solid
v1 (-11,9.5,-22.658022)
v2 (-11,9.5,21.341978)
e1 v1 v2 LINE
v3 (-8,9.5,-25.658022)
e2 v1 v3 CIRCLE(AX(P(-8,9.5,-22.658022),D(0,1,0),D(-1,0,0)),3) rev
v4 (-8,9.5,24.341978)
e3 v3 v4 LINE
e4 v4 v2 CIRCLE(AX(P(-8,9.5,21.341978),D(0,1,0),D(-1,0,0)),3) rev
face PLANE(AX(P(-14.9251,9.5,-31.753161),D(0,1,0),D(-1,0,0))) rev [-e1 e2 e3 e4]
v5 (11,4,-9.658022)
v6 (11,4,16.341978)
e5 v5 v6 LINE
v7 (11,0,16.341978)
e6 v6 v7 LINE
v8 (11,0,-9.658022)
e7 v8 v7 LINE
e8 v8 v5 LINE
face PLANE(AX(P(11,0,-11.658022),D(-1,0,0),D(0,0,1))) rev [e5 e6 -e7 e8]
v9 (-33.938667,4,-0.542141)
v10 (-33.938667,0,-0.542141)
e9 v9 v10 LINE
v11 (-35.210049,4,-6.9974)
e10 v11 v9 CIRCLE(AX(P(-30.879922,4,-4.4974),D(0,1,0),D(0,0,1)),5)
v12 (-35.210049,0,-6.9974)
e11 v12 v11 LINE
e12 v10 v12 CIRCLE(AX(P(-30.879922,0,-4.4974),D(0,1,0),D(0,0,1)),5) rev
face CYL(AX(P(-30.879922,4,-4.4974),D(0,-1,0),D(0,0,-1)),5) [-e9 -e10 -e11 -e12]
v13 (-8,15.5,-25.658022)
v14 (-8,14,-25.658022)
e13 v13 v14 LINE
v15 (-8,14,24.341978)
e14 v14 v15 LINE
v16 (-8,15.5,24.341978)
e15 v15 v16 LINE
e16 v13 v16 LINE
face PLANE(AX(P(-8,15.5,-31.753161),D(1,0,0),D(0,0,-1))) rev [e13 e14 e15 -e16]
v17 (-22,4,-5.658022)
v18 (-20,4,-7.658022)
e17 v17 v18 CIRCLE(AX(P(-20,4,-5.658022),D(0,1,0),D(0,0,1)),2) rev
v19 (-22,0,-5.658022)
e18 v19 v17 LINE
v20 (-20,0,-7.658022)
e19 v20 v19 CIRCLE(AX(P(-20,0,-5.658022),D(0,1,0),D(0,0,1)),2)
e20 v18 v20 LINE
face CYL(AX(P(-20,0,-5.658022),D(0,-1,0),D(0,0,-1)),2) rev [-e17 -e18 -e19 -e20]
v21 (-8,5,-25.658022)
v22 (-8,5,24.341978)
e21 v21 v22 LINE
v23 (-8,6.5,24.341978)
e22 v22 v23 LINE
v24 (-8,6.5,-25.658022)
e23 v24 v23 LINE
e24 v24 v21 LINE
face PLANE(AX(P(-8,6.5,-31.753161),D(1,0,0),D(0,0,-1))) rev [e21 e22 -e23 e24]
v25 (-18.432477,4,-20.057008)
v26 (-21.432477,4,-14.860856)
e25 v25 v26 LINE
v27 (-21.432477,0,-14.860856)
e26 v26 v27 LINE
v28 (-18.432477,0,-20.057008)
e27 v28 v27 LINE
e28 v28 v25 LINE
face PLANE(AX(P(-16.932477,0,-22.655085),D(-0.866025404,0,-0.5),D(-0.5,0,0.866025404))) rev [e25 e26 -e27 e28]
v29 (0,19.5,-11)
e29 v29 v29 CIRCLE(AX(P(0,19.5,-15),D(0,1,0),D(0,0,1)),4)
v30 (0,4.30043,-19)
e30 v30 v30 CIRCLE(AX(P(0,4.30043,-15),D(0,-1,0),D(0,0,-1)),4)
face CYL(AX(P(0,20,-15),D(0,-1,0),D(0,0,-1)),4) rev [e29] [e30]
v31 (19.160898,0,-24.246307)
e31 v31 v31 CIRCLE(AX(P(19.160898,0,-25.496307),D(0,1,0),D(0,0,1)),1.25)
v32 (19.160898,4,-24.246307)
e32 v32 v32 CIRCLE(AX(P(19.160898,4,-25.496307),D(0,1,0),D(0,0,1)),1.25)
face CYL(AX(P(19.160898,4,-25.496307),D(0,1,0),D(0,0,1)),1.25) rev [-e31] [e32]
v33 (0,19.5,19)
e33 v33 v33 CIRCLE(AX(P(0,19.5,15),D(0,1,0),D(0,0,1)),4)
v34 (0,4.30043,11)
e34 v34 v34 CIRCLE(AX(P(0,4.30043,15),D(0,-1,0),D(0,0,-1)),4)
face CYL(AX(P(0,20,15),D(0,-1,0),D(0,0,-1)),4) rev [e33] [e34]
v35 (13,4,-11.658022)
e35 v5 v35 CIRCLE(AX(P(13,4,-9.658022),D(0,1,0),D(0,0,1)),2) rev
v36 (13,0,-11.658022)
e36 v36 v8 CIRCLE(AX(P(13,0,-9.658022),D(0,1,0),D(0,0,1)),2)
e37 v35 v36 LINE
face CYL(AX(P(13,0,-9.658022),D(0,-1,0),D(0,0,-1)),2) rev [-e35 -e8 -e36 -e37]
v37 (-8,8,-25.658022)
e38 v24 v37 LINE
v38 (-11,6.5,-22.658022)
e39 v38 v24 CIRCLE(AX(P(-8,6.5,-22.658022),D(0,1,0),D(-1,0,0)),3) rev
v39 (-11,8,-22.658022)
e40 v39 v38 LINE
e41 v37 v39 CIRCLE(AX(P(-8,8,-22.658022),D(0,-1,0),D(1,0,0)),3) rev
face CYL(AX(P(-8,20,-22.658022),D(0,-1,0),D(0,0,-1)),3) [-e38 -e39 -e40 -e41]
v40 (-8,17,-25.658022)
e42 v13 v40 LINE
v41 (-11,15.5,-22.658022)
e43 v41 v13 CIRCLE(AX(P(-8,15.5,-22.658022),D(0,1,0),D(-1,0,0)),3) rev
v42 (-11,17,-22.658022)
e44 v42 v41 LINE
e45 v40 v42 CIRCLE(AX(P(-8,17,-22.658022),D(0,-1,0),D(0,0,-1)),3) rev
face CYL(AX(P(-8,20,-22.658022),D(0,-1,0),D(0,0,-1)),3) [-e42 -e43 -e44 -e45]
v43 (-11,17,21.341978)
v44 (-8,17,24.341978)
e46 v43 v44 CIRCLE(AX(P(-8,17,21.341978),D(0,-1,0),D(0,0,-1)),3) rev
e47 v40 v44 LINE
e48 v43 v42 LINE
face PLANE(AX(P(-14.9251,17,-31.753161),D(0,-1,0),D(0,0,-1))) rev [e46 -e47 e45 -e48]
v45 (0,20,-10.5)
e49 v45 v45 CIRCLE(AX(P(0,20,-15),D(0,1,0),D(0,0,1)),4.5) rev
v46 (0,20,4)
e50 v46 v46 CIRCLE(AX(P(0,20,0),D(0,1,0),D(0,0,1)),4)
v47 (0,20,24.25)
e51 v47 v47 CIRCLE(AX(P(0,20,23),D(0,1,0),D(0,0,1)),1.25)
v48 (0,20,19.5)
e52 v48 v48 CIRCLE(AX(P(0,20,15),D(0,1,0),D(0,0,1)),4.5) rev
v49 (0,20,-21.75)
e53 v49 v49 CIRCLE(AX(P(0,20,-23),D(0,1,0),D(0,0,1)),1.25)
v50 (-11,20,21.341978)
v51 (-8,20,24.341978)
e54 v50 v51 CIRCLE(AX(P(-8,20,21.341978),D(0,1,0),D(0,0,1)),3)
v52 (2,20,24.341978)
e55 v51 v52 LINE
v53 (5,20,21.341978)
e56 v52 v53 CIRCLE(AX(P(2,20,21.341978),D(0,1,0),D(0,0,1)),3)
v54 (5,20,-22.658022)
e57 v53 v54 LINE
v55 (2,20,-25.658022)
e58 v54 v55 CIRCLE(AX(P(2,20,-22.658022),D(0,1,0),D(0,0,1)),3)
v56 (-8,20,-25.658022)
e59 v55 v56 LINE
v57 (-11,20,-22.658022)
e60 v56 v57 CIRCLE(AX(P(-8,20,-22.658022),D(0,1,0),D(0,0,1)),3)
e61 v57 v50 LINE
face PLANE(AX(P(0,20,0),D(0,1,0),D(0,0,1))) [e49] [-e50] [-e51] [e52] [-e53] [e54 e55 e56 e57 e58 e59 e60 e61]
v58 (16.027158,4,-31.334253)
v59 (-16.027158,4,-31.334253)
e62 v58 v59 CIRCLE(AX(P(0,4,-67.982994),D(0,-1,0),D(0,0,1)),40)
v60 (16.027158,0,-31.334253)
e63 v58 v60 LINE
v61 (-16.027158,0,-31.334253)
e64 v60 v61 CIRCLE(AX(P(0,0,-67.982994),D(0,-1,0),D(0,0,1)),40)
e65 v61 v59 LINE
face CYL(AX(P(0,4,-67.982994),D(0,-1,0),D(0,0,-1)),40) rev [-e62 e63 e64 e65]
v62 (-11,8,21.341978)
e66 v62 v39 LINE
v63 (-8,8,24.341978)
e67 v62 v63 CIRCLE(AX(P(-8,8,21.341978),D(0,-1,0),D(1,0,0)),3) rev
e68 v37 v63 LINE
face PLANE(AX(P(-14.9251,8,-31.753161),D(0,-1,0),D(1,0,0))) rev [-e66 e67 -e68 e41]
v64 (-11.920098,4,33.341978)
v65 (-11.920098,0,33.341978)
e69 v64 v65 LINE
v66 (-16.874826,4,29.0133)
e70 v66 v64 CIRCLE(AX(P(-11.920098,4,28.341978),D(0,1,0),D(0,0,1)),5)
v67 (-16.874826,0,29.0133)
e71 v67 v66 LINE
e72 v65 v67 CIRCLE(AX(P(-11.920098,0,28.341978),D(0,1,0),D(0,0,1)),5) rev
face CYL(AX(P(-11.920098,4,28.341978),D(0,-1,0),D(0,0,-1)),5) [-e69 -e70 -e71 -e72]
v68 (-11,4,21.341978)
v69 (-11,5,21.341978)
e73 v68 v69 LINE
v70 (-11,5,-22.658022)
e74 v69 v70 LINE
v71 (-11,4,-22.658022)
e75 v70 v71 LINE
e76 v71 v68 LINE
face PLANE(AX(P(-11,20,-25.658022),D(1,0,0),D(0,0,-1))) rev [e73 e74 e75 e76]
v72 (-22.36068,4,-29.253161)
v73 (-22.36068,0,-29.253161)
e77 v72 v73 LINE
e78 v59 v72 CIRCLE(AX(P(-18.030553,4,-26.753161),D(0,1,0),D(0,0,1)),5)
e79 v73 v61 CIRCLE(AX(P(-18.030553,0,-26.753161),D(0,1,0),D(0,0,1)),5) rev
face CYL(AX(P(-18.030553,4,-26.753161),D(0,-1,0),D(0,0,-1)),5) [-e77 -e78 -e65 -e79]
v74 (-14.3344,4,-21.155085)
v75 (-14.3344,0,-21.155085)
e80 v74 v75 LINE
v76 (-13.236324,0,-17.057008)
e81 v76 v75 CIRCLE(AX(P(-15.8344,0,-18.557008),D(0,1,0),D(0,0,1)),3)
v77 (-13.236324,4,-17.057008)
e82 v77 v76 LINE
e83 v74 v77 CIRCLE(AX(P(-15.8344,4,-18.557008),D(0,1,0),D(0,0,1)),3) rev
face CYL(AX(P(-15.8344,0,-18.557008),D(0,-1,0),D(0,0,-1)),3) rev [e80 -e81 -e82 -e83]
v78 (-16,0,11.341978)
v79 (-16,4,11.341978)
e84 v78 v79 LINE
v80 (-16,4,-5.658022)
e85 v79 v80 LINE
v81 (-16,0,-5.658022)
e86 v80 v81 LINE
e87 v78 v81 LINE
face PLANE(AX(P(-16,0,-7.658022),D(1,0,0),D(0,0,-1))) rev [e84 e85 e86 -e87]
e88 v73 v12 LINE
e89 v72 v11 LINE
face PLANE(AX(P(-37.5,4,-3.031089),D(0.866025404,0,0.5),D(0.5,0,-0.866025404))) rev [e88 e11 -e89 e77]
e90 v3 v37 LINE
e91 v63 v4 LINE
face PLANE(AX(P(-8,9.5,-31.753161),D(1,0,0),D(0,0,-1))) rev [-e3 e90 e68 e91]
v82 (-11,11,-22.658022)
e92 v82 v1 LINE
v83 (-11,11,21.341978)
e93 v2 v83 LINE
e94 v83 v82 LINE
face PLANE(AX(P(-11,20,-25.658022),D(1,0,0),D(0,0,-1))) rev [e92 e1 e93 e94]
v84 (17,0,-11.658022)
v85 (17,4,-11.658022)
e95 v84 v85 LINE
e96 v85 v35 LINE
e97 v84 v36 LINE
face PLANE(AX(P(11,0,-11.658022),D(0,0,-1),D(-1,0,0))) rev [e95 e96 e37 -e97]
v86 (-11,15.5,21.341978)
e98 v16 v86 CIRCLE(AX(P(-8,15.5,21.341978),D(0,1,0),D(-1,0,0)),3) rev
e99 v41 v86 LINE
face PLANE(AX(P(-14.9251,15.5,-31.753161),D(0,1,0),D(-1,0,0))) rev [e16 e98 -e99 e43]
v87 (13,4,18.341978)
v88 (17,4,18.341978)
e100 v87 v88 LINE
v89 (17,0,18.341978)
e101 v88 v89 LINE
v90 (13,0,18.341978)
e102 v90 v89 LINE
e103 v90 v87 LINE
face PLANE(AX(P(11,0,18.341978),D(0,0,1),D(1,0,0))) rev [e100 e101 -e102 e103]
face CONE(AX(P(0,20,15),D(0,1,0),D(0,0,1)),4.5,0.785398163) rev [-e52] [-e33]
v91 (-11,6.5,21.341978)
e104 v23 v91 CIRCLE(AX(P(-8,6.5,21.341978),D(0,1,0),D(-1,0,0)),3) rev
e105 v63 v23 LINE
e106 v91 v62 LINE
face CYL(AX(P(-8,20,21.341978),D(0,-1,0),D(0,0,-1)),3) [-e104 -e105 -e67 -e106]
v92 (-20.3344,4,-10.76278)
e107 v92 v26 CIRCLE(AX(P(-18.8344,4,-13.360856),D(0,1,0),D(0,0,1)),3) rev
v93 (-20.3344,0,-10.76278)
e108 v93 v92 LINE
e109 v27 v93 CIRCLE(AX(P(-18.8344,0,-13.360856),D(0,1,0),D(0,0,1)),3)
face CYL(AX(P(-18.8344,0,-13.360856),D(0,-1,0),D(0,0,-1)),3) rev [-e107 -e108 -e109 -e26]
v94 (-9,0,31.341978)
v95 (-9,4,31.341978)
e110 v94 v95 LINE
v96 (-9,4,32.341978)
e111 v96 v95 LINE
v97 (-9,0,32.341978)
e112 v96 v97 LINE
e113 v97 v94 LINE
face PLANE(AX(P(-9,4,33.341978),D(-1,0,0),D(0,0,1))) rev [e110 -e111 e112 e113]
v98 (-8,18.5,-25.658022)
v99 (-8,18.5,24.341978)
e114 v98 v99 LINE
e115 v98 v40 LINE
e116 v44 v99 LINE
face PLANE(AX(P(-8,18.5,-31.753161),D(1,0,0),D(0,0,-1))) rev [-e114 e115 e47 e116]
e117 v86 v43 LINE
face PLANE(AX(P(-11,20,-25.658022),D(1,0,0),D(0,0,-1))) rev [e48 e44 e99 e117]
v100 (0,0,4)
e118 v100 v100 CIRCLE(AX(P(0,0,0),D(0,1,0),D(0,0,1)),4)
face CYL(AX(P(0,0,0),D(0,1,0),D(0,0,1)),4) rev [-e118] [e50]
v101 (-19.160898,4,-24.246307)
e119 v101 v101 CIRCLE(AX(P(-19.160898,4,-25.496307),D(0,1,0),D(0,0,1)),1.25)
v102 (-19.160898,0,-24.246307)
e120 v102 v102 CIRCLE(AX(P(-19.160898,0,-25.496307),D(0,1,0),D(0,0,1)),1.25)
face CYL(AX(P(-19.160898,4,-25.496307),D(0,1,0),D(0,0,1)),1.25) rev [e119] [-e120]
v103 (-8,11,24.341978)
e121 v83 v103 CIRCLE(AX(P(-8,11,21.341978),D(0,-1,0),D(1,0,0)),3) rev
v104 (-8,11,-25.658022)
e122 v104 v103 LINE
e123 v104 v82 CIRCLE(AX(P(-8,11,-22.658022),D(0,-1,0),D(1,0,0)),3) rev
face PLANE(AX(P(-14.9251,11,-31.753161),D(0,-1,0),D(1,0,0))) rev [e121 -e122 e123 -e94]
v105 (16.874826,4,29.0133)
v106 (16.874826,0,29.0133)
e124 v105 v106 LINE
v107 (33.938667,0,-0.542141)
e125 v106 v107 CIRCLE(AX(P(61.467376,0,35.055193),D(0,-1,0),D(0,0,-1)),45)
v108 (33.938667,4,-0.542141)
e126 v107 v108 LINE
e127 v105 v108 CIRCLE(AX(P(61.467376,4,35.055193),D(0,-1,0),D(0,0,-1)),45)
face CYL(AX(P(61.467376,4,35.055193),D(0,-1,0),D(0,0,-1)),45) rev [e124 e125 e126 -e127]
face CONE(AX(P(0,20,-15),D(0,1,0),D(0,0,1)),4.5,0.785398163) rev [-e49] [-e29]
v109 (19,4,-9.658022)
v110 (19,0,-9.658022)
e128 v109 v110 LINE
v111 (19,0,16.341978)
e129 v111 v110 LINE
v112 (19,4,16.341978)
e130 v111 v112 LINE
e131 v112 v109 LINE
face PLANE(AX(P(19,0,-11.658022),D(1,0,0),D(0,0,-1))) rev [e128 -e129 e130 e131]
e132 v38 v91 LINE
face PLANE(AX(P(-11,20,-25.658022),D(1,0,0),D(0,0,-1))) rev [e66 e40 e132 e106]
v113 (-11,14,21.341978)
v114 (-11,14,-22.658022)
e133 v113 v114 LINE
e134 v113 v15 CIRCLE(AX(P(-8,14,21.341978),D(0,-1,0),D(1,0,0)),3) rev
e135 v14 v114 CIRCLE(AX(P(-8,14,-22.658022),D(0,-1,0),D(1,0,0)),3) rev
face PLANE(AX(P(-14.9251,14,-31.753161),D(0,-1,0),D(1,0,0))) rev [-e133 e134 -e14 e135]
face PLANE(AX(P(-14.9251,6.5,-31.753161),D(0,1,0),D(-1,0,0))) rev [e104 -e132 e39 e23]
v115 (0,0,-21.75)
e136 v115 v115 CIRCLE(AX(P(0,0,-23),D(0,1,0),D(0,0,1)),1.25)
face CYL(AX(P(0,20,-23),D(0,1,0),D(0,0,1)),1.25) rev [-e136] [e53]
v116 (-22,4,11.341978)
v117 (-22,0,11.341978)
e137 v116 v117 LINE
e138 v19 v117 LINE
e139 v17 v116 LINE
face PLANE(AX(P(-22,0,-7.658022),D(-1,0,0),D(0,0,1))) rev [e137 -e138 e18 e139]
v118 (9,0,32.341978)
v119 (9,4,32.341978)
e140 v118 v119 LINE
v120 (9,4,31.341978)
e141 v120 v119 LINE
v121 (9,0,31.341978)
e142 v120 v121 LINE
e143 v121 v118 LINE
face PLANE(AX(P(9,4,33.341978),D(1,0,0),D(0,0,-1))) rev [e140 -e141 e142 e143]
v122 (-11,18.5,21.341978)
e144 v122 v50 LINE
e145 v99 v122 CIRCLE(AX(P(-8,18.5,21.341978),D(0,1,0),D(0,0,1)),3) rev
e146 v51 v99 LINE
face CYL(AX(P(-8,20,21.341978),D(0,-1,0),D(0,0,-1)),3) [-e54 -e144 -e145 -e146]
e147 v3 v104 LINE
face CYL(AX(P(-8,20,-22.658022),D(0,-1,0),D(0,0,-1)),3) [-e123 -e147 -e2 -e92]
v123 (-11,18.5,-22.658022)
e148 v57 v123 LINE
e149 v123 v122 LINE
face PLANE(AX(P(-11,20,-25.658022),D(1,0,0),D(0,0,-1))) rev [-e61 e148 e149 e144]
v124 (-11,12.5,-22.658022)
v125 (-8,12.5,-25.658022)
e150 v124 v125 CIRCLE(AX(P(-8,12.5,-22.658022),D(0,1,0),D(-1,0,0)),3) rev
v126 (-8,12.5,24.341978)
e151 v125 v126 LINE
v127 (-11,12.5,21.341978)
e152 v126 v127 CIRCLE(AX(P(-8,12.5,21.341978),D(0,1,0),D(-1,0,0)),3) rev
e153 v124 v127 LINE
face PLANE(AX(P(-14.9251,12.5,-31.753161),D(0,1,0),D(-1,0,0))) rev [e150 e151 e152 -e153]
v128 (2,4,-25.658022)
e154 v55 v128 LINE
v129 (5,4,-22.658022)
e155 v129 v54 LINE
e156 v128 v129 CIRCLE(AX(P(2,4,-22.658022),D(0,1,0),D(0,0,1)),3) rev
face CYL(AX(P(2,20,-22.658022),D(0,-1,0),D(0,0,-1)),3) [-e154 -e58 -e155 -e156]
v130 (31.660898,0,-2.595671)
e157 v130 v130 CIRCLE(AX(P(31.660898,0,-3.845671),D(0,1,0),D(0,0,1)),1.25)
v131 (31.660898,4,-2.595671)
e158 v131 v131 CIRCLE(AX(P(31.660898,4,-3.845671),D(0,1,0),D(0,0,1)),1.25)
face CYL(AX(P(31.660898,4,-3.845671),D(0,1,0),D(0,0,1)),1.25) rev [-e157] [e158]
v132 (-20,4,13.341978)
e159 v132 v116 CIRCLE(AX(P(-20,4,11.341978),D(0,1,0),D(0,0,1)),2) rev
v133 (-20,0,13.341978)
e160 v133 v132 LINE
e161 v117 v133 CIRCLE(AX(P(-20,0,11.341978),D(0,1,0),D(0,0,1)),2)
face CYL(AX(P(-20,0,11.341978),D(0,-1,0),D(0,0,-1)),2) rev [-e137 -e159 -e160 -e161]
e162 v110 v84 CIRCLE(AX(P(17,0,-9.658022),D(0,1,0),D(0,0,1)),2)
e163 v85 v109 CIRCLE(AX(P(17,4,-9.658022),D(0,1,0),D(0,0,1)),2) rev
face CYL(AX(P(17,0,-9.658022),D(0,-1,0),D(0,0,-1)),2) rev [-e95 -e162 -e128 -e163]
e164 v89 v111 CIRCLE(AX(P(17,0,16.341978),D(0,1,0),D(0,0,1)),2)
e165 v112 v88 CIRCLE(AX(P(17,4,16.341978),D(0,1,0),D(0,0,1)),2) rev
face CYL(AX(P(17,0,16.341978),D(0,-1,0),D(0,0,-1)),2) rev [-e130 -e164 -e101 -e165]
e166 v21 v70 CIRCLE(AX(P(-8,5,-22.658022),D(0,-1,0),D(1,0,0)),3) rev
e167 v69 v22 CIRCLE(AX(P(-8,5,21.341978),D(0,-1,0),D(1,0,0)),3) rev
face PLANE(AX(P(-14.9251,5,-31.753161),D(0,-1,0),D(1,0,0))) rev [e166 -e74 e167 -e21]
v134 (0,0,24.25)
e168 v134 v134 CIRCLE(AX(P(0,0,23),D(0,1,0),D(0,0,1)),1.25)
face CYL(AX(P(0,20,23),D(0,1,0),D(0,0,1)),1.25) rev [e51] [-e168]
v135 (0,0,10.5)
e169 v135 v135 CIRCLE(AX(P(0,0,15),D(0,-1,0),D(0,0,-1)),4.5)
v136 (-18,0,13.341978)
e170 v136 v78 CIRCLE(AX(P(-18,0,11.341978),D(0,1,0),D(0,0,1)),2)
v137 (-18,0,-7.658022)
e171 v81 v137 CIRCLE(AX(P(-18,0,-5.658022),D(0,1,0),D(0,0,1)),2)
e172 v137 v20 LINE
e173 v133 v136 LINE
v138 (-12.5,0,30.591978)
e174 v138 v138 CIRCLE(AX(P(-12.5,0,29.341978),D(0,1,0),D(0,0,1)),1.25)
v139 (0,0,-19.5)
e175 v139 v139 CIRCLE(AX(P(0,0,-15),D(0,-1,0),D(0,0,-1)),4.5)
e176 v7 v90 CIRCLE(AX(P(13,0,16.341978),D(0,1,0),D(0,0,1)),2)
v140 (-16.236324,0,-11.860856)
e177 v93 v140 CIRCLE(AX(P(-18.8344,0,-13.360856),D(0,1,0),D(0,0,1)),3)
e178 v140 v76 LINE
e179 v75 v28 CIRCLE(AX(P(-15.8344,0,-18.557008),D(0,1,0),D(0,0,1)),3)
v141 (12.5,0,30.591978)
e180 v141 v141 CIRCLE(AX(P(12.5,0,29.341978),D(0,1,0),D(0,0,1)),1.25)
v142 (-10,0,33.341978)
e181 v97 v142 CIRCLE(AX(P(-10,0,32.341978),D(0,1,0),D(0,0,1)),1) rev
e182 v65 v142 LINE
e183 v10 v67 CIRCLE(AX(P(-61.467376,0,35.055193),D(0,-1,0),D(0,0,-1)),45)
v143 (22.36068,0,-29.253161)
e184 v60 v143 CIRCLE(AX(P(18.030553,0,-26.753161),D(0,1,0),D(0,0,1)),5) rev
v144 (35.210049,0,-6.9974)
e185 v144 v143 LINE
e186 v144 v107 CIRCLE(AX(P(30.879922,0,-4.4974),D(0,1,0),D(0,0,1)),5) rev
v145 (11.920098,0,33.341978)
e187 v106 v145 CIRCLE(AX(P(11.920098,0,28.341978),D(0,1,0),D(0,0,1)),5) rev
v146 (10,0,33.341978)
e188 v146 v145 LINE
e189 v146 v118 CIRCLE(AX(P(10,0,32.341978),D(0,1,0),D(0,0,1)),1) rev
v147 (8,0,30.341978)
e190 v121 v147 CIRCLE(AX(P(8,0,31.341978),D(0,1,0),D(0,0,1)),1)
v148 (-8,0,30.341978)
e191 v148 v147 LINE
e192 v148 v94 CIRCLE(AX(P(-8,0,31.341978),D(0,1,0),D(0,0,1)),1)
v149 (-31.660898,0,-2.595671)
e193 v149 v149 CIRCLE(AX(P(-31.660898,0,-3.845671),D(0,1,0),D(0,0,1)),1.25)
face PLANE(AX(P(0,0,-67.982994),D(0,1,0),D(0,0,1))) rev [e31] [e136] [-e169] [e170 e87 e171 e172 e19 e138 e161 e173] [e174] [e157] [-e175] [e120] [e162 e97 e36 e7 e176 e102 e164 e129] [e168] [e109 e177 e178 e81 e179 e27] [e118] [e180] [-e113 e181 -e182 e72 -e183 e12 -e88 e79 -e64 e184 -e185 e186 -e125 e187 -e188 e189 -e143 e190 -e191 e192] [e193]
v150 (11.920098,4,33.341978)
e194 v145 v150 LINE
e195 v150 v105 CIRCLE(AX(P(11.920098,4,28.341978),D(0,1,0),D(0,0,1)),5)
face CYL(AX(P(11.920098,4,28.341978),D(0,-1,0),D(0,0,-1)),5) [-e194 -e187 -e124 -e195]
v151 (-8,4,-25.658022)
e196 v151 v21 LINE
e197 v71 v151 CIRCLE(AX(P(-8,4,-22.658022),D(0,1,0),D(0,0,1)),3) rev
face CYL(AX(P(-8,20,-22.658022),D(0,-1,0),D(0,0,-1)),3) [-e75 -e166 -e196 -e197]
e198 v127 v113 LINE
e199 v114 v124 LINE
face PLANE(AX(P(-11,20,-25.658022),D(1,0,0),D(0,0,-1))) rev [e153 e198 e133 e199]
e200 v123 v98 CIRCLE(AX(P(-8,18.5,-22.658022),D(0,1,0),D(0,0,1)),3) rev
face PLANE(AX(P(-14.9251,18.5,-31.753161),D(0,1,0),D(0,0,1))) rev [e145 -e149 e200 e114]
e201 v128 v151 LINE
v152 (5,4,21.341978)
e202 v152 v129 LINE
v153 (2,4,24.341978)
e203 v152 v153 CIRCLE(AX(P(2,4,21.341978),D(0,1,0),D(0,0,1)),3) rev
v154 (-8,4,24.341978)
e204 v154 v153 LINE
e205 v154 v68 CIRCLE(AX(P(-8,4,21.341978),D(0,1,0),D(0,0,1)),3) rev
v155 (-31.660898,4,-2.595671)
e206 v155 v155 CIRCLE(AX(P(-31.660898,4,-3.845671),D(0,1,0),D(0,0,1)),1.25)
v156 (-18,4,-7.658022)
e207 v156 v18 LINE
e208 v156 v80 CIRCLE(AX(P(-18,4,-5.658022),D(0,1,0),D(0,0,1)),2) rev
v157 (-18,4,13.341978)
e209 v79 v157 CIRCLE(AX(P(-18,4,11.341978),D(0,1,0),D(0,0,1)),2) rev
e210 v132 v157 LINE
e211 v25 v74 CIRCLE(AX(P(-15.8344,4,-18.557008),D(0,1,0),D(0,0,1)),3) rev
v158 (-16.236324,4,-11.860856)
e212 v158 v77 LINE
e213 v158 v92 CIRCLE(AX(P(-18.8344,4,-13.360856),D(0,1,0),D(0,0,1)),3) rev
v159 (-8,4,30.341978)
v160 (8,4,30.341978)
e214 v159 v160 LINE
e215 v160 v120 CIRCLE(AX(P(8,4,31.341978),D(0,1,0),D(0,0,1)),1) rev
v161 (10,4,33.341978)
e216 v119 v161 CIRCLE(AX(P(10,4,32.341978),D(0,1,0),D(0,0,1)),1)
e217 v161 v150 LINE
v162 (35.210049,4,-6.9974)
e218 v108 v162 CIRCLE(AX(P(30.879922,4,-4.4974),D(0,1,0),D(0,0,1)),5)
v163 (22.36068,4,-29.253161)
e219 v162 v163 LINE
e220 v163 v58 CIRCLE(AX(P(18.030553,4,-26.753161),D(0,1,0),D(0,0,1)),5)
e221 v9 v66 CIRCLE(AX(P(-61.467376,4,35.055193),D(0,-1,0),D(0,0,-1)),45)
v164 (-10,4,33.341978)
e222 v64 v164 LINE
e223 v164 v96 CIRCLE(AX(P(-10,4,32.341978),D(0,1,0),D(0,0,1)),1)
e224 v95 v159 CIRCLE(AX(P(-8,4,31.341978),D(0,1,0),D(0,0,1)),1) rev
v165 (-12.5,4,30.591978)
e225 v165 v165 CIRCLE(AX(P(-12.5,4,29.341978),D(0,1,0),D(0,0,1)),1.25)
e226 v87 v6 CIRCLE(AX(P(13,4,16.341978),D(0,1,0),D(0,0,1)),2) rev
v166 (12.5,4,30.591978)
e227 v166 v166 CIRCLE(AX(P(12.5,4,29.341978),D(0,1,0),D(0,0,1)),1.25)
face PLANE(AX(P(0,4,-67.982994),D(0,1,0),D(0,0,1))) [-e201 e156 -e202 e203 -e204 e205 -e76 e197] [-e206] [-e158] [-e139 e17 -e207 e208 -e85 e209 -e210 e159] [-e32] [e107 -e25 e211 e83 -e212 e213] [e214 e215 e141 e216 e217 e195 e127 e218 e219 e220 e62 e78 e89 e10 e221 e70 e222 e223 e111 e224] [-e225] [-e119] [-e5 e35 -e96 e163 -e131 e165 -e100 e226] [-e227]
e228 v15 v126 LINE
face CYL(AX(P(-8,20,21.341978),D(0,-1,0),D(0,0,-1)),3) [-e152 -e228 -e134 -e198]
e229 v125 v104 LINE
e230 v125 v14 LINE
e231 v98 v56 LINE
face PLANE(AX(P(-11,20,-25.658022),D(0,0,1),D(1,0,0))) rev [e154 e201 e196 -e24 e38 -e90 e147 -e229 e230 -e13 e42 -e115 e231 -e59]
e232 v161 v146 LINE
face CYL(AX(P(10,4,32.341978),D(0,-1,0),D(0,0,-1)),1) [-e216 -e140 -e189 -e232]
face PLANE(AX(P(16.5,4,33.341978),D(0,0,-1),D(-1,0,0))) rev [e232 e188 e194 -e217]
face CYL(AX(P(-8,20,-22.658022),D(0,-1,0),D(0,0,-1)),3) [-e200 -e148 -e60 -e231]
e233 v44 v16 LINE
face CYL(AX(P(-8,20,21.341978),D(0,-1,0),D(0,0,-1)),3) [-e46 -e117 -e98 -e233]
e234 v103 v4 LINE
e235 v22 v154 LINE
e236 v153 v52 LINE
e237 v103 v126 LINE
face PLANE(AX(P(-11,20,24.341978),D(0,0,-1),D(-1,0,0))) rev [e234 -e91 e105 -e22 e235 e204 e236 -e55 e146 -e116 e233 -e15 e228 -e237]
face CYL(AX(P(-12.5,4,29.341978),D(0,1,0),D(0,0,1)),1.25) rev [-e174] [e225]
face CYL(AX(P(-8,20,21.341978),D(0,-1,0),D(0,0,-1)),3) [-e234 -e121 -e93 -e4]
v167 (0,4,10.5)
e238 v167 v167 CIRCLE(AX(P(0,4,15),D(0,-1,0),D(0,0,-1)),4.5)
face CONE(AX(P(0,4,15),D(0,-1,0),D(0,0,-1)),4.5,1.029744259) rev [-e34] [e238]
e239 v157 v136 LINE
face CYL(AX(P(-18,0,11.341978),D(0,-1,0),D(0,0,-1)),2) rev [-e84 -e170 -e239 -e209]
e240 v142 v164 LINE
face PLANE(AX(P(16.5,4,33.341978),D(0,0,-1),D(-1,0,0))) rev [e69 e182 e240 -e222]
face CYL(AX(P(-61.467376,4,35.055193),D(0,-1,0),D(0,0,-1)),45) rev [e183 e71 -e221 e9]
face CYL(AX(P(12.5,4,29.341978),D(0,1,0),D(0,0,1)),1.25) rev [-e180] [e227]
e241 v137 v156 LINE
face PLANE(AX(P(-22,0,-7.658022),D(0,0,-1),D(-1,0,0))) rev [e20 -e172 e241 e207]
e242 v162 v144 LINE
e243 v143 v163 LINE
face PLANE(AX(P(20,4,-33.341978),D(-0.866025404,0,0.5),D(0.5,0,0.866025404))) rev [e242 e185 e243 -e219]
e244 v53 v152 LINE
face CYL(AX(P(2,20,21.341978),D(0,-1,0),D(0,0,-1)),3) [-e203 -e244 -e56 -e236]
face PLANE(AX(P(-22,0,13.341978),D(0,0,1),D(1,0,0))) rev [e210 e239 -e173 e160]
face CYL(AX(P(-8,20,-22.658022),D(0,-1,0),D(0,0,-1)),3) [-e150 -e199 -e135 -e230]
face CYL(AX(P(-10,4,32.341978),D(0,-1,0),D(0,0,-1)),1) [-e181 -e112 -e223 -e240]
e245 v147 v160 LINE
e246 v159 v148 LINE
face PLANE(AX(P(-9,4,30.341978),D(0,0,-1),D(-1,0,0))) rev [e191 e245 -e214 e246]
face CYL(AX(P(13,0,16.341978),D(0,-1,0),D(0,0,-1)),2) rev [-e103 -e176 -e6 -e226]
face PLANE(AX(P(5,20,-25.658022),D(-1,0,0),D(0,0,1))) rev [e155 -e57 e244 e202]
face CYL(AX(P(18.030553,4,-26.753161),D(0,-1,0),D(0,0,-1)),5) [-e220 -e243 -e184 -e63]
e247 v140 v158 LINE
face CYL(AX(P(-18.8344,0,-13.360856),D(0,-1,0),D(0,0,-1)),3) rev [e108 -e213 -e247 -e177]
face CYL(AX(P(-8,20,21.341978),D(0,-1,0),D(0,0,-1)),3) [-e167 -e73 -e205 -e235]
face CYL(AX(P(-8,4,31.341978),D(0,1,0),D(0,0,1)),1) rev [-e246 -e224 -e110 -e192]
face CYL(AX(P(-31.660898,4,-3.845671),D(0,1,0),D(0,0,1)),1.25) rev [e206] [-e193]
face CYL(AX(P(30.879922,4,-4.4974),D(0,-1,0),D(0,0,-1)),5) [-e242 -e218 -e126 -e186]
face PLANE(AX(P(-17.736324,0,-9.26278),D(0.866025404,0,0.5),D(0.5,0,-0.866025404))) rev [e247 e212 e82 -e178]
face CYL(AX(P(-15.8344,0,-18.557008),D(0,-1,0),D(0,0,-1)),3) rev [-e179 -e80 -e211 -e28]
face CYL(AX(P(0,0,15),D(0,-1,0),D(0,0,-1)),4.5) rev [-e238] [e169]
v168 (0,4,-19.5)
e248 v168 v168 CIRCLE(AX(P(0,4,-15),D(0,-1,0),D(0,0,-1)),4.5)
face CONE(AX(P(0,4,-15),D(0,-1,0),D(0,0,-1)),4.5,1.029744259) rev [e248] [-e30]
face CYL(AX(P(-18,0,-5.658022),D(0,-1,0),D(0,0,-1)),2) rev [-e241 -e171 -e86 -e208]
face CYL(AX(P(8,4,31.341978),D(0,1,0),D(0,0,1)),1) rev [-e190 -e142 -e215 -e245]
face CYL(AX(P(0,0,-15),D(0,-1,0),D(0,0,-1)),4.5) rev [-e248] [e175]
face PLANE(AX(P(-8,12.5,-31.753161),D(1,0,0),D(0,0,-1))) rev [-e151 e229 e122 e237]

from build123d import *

# Parameters (mm, degrees)
EXTRUDE_1_DEPTH           = 4
FILLET_1_R                = 5
SKETCH_2_W                = 16
SKETCH_2_H                = 50
EXTRUDE_2_DEPTH           = 16
FILLET_2_R                = 3
SKETCH_3_W                = 6.925100322
SKETCH_3_H                = 1.5
CUT_EXTRUDE_1_DEPTH       = 70.527213361
SKETCH_4_W                = 8
SKETCH_4_H                = 30
CUT_EXTRUDE_2_DEPTH       = 52.527238457
FILLET_3_R                = 2
SKETCH_5_R                = 4
CUT_EXTRUDE_3_DEPTH       = 53.906108371
SKETCH_6_W                = 6
SKETCH_6_H                = 21
CUT_EXTRUDE_4_DEPTH       = 52.527238457
FILLET_4_R                = 2
SKETCH_7_R                = 4
CUT_EXTRUDE_5_DEPTH       = 53.906108371
CHAMFER_1_SIZE            = 0.5
M10X1_0_1_D               = 9
M10X1_0_1_DEPTH           = 4
M10X1_0_1_TIP             = 2.703872786
SKETCH_10_R               = 1
CUT_EXTRUDE_6_DEPTH       = 53.906108371
HOLE_WIZARD_M3_1_D        = 2.5
CUT_EXTRUDE_7_DEPTH       = 52.527238457
FILLET_5_R                = 3
SKETCH_17_W               = 18
SKETCH_17_H               = 3
CUT_EXTRUDE_10_DEPTH      = 4
SKETCH_18_R               = 1
CUT_EXTRUDE_11_DEPTH      = 52.527238457
HOLE_WIZARD_M3_3_D        = 2.5
PATTERN_CIRCULAR_14_COUNT = 3
FILLET_8_R                = 1


with BuildPart() as part:
    # 草圖1 → 填料-伸長1 (new body)
    with BuildSketch(Plane(origin=(0, 0, 0), x_dir=(1, 0, 0), z_dir=(0, 1, 0))):
        with BuildLine():
            Line((20, 33.341978046), (37.5, 3.031088913))
            ThreePointArc((37.5, 3.031088913), (22.496232709, -12.555193308), (16.5, -33.341978046))
            Line((16.5, -33.341978046), (-16.5, -33.341978046))
            ThreePointArc((-16.5, -33.341978046), (-22.496232709, -12.555193308), (-37.5, 3.031088913))
            Line((-37.5, 3.031088913), (-20, 33.341978046))
            ThreePointArc((-20, 33.341978046), (0, 27.982994197), (20, 33.341978046))
        make_face()
    extrude(amount=EXTRUDE_1_DEPTH)

    # 圓角1
    fillet_1_edges = [part.edges().sort_by_distance(p)[0] for p in [
        (20, 2, -33.341978046),
        (37.5, 2, -3.031088913),
        (16.5, 2, 33.341978046),
        (-16.5, 2, 33.341978046),
        (-37.5, 2, -3.031088913),
        (-20, 2, -33.341978046),
    ]]
    fillet(fillet_1_edges, radius=FILLET_1_R)

    # 草圖2 → 填料-伸長2 (add)
    with BuildSketch(Plane(origin=(0, 4, 0), x_dir=(1, 0, 0), z_dir=(0, 1, 0))):
        with Locations((-3, 0.658021954)):
            Rectangle(SKETCH_2_W, SKETCH_2_H)
    extrude(amount=EXTRUDE_2_DEPTH)

    # 圓角2
    fillet_2_edges = [part.edges().sort_by_distance(p)[0] for p in [
        (-11, 12, -25.658021954),
        (-11, 12, 24.341978046),
        (5, 12, 24.341978046),
        (5, 12, -25.658021954),
    ]]
    fillet(fillet_2_edges, radius=FILLET_2_R)

    # 草圖3 → 除料-伸長1 (cut, through all)
    with BuildSketch(Plane.XY.offset(24.341978046)):
        with Locations((-11.462550161, 17.75)):
            Rectangle(SKETCH_3_W, SKETCH_3_H)
        with Locations((-11.462550161, 14.75)):
            Rectangle(SKETCH_3_W, SKETCH_3_H)
        with Locations((-11.462550161, 11.75)):
            Rectangle(SKETCH_3_W, SKETCH_3_H)
        with Locations((-11.462550161, 8.75)):
            Rectangle(SKETCH_3_W, SKETCH_3_H)
        with Locations((-11.462550161, 5.75)):
            Rectangle(SKETCH_3_W, SKETCH_3_H)
    extrude(amount=-CUT_EXTRUDE_1_DEPTH, mode=Mode.SUBTRACT)

    # 草圖4 → 除料-伸長2 (cut, through all)
    with BuildSketch(Plane(origin=(0, 4, 0), x_dir=(1, 0, 0), z_dir=(0, 1, 0))):
        with Locations((15, -3.341978046)):
            Rectangle(SKETCH_4_W, SKETCH_4_H)
    extrude(amount=-CUT_EXTRUDE_2_DEPTH, mode=Mode.SUBTRACT)

    # 圓角3
    fillet_3_edges = [part.edges().sort_by_distance(p)[0] for p in [
        (11, 2, 18.341978046),
        (11, 2, -11.658021954),
        (19, 2, -11.658021954),
        (19, 2, 18.341978046),
    ]]
    fillet(fillet_3_edges, radius=FILLET_3_R)

    # 草圖5 → 除料-伸長3 (cut, through all)
    with BuildSketch(Plane(origin=(0, 20, 0), x_dir=(1, 0, 0), z_dir=(0, 1, 0))):
        with Locations(Location((0, 0, 0), (0, 0, 270))):
            Circle(SKETCH_5_R)
    extrude(amount=-CUT_EXTRUDE_3_DEPTH, mode=Mode.SUBTRACT)

    # 草圖6 → 除料-伸長4 (cut, through all)
    with BuildSketch(Plane(origin=(0, 4, 0), x_dir=(1, 0, 0), z_dir=(0, 1, 0))):
        with Locations((-19, -2.841978046)):
            Rectangle(SKETCH_6_W, SKETCH_6_H)
    extrude(amount=-CUT_EXTRUDE_4_DEPTH, mode=Mode.SUBTRACT)

    # 圓角4
    fillet_4_edges = [part.edges().sort_by_distance(p)[0] for p in [
        (-22, 2, 13.341978046),
        (-22, 2, -7.658021954),
        (-16, 2, -7.658021954),
        (-16, 2, 13.341978046),
    ]]
    fillet(fillet_4_edges, radius=FILLET_4_R)

    # 草圖7 → 除料-伸長5 (cut, through all)
    with BuildSketch(Plane.XZ):
        with Locations(Location((0, 15, 0), (0, 0, 270))):
            Circle(SKETCH_7_R)
        with Locations(Location((0, -15, 0), (0, 0, 270))):
            Circle(SKETCH_7_R)
    extrude(amount=-CUT_EXTRUDE_5_DEPTH, mode=Mode.SUBTRACT)

    # 導角1
    chamfer_1_edges = [part.edges().sort_by_distance(p)[0] for p in [
        (0, 20, 19),
        (0, 20, -11),
    ]]
    chamfer(chamfer_1_edges, length=CHAMFER_1_SIZE)

    # M10x1.0 螺紋孔1
    with Locations(Plane(origin=(0, 0, 0), x_dir=(-1, 0, 0), z_dir=(0, -1, 0))):
        with Locations((0, 15), (0, -15)):
            Hole(M10X1_0_1_D / 2, depth=M10X1_0_1_DEPTH)
            with Locations((0, 0, -(M10X1_0_1_DEPTH + M10X1_0_1_TIP / 2))):  # 118° drill point
                Cone(0, M10X1_0_1_D / 2, M10X1_0_1_TIP, mode=Mode.SUBTRACT)

    # 草圖10 → 除料-伸長6 (cut, through all)
    with BuildSketch(Plane.XZ):
        with Locations(Location((0, 23, 0), (0, 0, 270))):
            Circle(SKETCH_10_R)
        with Locations(Location((0, -23, 0), (0, 0, 270))):
            Circle(SKETCH_10_R)
    extrude(amount=-CUT_EXTRUDE_6_DEPTH, mode=Mode.SUBTRACT)

    # M3 螺紋孔1 (through all)
    with Locations(Plane(origin=(0, 20, 23), x_dir=(0, 0, 1), z_dir=(0, 1, 0))):
        with Locations((0, 0), (-46, 0)):
            Hole(HOLE_WIZARD_M3_1_D / 2)

    # 草圖12 → 除料-伸長7 (cut, through all)
    with BuildSketch(Plane(origin=(0, 4, 0), x_dir=(1, 0, 0), z_dir=(0, 1, 0))):
        Polygon((-16.932476545, 22.655084524), (-22.932476545, 12.262779678), (-17.736324122, 9.262779678), (-11.736324122, 19.655084524), align=None)
    extrude(amount=-CUT_EXTRUDE_7_DEPTH, mode=Mode.SUBTRACT)

    # 圓角5
    fillet_5_edges = [part.edges().sort_by_distance(p)[0] for p in [
        (-11.736324122, 2, -19.655084524),
        (-17.736324122, 2, -9.262779678),
        (-22.932476545, 2, -12.262779678),
        (-16.932476545, 2, -22.655084524),
    ]]
    fillet(fillet_5_edges, radius=FILLET_5_R - 0.0001)  # a hair under: the kernel refuses the full size

    # 草圖17 → 除料-伸長10 (cut)
    with BuildSketch(Plane.XZ):
        with Locations((0, 31.841978046)):
            Rectangle(SKETCH_17_W, SKETCH_17_H)
    extrude(amount=-CUT_EXTRUDE_10_DEPTH, mode=Mode.SUBTRACT)

    # 草圖18 → 除料-伸長11 (cut, through all)
    with BuildSketch(Plane(origin=(0, 4, 0), x_dir=(1, 0, 0), z_dir=(0, 1, 0))):
        with Locations(Location((-12.5, -29.341978046, 0), (0, 0, 270))):
            Circle(SKETCH_18_R)
        with Locations(Location((12.5, -29.341978046, 0), (0, 0, 270))):
            Circle(SKETCH_18_R)
    cut_extrude_11 = extrude(amount=-CUT_EXTRUDE_11_DEPTH, mode=Mode.SUBTRACT)

    # M3 螺紋孔3 (through all)
    with Locations(Plane(origin=(-12.5, 4, 29.341978046), x_dir=(0, 0, 1), z_dir=(0, 1, 0))):
        with Locations((0, 0), (0, 25)):
            hole_wizard_m3_3 = Hole(HOLE_WIZARD_M3_3_D / 2)

    # 環狀複製排列14: 除料-伸長11, M3 螺紋孔3 ×3 about axis
    pattern_circular_14_axis = Axis((0, 0, 0), (0, 1, 0))
    add([cut_extrude_11.rotate(pattern_circular_14_axis, i * 360 / PATTERN_CIRCULAR_14_COUNT) for i in range(1, PATTERN_CIRCULAR_14_COUNT)], mode=Mode.SUBTRACT)
    add([hole_wizard_m3_3.rotate(pattern_circular_14_axis, i * 360 / PATTERN_CIRCULAR_14_COUNT) for i in range(1, PATTERN_CIRCULAR_14_COUNT)], mode=Mode.SUBTRACT)

    # 圓角8
    fillet_8_edges = [part.edges().sort_by_distance(p)[0] for p in [
        (-9, 2, 30.341978046),
        (-9, 2, 33.341978046),
        (9, 2, 33.341978046),
        (9, 2, 30.341978046),
    ]]
    fillet(fillet_8_edges, radius=FILLET_8_R)


solid = part.part
